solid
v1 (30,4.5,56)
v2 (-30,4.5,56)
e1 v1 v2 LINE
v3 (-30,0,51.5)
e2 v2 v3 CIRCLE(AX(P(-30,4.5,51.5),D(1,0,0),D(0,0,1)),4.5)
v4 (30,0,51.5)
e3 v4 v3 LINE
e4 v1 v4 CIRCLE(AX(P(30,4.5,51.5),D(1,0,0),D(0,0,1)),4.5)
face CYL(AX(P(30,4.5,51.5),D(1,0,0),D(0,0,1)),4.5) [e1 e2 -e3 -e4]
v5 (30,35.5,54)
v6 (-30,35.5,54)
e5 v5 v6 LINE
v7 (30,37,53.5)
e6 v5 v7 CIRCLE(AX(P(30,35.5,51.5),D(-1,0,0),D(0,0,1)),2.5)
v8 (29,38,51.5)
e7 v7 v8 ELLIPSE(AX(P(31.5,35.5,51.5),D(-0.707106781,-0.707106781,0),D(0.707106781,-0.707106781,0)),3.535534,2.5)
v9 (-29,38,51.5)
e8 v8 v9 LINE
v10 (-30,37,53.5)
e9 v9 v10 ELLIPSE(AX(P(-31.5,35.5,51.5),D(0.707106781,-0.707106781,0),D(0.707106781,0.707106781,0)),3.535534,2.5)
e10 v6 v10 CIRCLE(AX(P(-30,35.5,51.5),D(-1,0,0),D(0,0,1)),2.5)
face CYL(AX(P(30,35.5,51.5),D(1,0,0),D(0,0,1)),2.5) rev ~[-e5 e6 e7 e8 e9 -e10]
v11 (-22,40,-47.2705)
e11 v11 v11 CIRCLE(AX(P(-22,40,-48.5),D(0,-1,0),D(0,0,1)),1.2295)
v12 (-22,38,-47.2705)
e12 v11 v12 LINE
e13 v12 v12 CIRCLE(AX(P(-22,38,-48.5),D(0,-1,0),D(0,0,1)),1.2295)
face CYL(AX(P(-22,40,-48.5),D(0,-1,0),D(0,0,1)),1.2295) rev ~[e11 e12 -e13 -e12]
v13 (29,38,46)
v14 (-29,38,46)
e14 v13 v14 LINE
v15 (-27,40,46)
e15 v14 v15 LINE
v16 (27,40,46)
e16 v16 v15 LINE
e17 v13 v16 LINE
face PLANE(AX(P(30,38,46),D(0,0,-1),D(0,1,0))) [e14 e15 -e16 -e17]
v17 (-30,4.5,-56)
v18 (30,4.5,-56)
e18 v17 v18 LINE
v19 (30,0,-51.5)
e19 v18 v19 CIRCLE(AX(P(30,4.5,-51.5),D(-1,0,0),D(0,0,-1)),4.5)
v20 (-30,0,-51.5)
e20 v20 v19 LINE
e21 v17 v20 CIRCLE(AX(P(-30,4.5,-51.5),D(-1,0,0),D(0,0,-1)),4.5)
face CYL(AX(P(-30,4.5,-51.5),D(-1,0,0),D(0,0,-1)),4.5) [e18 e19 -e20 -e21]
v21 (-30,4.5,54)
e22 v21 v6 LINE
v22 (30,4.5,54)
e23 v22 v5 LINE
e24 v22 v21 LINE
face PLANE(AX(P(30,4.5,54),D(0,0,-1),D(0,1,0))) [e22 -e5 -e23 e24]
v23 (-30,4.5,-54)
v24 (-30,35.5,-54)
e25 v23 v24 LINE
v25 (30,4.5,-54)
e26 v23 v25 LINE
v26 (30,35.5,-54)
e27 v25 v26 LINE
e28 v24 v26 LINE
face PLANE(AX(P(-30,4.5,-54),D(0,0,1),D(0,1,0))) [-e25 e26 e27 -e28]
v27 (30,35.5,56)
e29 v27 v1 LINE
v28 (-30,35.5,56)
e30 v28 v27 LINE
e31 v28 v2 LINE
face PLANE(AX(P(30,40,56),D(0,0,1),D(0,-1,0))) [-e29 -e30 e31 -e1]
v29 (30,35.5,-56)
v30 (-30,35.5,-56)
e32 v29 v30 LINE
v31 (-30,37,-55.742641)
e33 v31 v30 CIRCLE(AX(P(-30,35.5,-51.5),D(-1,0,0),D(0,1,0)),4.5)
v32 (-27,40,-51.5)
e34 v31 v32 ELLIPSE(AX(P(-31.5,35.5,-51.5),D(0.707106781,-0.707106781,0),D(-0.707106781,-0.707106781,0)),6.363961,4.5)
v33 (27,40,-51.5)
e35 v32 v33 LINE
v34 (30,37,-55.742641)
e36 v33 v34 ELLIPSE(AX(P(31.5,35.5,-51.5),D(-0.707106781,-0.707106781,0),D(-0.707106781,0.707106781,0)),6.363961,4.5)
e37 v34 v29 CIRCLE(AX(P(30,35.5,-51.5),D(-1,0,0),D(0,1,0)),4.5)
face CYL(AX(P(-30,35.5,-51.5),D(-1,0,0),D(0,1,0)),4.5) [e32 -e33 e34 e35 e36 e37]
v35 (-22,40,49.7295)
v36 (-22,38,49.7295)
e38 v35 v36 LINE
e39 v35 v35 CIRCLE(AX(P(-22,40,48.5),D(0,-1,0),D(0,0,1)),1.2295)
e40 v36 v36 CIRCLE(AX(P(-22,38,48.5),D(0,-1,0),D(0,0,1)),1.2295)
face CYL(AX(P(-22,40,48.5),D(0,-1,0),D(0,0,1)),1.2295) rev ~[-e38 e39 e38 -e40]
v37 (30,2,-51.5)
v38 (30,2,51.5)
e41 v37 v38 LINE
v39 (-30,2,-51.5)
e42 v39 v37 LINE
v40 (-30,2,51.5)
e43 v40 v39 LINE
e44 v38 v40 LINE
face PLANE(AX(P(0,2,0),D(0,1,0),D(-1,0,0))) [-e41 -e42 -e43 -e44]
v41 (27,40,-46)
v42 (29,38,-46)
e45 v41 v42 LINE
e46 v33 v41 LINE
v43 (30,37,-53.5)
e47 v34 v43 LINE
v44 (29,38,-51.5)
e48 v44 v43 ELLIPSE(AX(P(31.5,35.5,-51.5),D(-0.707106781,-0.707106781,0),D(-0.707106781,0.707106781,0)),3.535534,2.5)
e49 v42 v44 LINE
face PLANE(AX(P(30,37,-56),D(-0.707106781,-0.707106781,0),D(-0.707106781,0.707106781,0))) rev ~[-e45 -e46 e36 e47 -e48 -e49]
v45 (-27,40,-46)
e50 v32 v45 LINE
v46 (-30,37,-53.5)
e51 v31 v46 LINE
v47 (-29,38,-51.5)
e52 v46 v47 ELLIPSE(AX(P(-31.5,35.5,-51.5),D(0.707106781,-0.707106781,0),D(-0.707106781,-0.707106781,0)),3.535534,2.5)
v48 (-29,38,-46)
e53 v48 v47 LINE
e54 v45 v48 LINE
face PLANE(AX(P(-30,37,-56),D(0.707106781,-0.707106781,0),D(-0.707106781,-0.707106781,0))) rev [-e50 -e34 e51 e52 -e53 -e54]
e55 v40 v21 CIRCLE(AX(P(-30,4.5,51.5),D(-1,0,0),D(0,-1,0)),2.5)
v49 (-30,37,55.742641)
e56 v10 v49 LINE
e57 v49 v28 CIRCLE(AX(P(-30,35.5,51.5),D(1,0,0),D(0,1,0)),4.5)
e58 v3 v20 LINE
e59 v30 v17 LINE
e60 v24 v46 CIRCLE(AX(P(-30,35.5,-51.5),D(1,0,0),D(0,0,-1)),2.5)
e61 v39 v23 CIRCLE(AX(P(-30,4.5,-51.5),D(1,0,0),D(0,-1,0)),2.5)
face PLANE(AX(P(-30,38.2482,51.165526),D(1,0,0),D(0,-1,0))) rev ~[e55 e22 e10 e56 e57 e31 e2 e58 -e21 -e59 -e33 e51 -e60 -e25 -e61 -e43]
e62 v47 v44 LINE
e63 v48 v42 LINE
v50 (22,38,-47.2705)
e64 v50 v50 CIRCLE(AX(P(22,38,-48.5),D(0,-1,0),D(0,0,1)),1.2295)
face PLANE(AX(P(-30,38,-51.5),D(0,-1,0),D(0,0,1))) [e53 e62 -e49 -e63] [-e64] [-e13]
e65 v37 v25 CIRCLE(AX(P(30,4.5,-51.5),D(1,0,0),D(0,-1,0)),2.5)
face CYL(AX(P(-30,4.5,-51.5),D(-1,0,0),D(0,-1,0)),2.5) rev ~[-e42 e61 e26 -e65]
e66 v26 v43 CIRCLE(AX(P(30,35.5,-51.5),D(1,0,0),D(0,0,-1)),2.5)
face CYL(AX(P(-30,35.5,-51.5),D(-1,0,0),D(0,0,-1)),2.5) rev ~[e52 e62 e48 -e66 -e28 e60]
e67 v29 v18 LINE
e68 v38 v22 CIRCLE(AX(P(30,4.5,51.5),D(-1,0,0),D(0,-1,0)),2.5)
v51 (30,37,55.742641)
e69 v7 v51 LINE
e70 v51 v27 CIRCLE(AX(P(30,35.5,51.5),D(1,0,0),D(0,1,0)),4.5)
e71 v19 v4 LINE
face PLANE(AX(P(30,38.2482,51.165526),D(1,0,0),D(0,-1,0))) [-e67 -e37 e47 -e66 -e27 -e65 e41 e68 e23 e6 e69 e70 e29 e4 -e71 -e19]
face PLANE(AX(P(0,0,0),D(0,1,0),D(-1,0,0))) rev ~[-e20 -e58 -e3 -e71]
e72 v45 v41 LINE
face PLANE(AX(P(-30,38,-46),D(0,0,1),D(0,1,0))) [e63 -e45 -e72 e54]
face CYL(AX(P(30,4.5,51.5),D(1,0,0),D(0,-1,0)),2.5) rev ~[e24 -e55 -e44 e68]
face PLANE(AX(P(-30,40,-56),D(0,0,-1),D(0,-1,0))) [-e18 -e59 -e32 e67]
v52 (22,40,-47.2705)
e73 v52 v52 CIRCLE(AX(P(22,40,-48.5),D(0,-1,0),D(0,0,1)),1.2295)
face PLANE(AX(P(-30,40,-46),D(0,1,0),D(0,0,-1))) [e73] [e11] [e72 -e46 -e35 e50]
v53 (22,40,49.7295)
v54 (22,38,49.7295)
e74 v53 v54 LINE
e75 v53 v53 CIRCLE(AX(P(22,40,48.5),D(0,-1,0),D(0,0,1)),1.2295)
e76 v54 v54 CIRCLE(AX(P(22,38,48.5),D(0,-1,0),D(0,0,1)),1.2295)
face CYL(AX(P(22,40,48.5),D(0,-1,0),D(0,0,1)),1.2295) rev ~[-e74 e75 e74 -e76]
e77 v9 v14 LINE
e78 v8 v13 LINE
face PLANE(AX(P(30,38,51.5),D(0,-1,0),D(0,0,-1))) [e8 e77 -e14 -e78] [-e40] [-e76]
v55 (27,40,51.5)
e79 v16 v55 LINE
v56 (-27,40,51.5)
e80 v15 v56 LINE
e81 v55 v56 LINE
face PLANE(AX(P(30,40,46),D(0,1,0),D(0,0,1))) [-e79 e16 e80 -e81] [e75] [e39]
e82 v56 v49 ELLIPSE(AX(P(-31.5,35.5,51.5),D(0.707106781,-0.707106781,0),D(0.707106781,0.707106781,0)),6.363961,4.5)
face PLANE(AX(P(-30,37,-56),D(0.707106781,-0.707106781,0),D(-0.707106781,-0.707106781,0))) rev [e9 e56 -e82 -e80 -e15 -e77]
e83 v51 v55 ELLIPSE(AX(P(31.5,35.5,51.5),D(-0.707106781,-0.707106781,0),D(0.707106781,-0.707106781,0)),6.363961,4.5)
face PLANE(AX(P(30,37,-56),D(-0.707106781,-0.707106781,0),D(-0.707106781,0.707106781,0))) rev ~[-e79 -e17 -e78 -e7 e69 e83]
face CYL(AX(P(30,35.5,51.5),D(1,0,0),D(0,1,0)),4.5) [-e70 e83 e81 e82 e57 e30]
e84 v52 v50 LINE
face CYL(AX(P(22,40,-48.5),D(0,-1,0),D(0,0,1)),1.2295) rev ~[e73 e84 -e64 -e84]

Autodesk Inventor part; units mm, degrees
ref_plane "YZ Plane" through (0, 0, 0) normal (1, 0, 0) x (0, 1, 0)
ref_plane "XZ Plane" through (0, 0, 0) normal (0, 1, 0) x (-1, 0, 0)
ref_plane "XY Plane" through (0, 0, 0) normal (0, 0, 1) x (1, 0, 0)
sketch "Szkic1" plane through (0, 0, 0) normal (0, 1, 0) x (-1, 0, 0)
  line L0 (-30, 56) -> (30, 56)
  line L1 (30, 56) -> (30, -56)
  line L2 (30, -56) -> (-30, -56)
  line L3 (-30, -56) -> (-30, 56)
  line L4 (-30, 56) -> (30, -56) construction
  line L5 (30, 56) -> (-30, -56) construction
  point P0 (0, 0)
  dimension "d0" = 60
  dimension "d1" = 112
extrude "Płyta1" add sketch "Szkic1" along normal blind 2
sketch "Szkic2" plane through (30, 0, 54) normal (0, 0, 1) x (1, 0, 0)
  line L0 (-60, 0) -> (0, 0)
  line L1 (0, 0) -> (0, 40)
  line L2 (0, 40) -> (-60, 40)
  line L3 (-60, 40) -> (-60, 0)
edge flange "Kołnierz1" height 40 angle 90 thickness 2 bend radius 2.5 thickness toward (0, 0, 1) relief tear relief width 2 relief depth 1 corner gap 2 corner form 0 edges at (0, 2, 56) (0, 2, -56) wall of the first edge with corners at (-30, 0, 54) (30, 0, 54) (30, 40, 54) (-30, 40, 54)
bend "Zagięcie1"
corner "Narożnik1"
sketch "Szkic3" plane through (30, 38, 56) normal (0, 1, 0) x (-1, 0, 0)
  line L0 (60, 0) -> (0, 0)
  line L1 (0, 0) -> (0, -10)
  line L2 (0, -10) -> (60, -10)
  line L3 (60, -10) -> (60, 0)
edge flange "Kołnierz2" height 10 angle 90 thickness 2 bend radius 2.5 thickness toward (0, 1, 0) relief tear relief width 2 relief depth 1 corner gap 2 corner form 0 edges at (0, 40, 54) (0, 40, -54) wall of the first edge with corners at (-30, 38, 56) (30, 38, 56) (30, 38, 46) (-30, 38, 46)
bend "Zagięcie2"
corner "Narożnik2"
sketch "Szkic4" plane through (-30, 40, 46) normal (0, 1, 0) x (1, 0, 0)
  line L0 (60, 92) -> (0, 92) projected
  line L1 (0, 0) -> (60, 0) projected
  line L2 (0, 92) -> (0, 97.5) projected
  line L3 (60, 97.5) -> (60, 92) projected
  point P0 (30, 46)
  point P1 (8, -2.5)
  point P2 (52, -2.5)
  point P3 (8, 94.5)
  point P4 (52, 94.5)
  dimension "d24" = 2.5
  dimension "d25" = 2.5
  dimension "d26" = 2.5
  dimension "d27" = 2.5
  dimension "d28" = 8
  dimension "d29" = 8
hole "Otwór1" at (-22, 40, 48.5) at (22, 40, 48.5) at (-22, 40, -48.5) at (22, 40, -48.5) direction (0, -1, 0) diameter 2.459 depth 8.8 tip angle 118 thread size "M3x0.5" class "6H" standard "ANSI Metric M Profile"
sketch "Szkic5" plane through (30, 4.5, -56) normal (0, 0, -1) x (-1, 0, 0)
  line L0 (0, 33.5) -> (0, 31) projected
  line L1 (0, 32.5) -> (3, 35.5)
  line L2 (0, 35.5) -> (60, 35.5) projected
  line L3 (0, 35.5) -> (0, 31) projected
  point P0 (30, -4.5)
  dimension "d37" = 45
  dimension "d38" = 3
extrude "Wyciągnięcie proste1" cut sketch "Szkic5" against normal through all
mirror "Odbij1" about plane through (0, 0, 0) normal (1, 0, 0) of "Wyciągnięcie proste1"
equation "\"d2\" = Grubość"
equation "\"d3\" = SzerokośćGięciaPodcięcia"
equation "\"d4\" = GłębokośćGięciaPodcięcia"
equation "\"d5\" = MinimalnaPozostałość"
equation "\"d6\" = PromieńPrzejścia"
equation "\"d10\" = RozmiarPodcięciaNarożnika"
equation "\"d11\" = Wielk_odstępu"
equation "\"d12\" = Rozmiar_promienia_Jacobiego"
equation "\"d14\" = SzerokośćGięciaPodcięcia"
equation "\"d15\" = GłębokośćGięciaPodcięcia"
equation "\"d16\" = MinimalnaPozostałość"
equation "\"d17\" = PromieńPrzejścia"
equation "\"d21\" = RozmiarPodcięciaNarożnika"
equation "\"d22\" = Wielk_odstępu"
equation "\"d23\" = Rozmiar_promienia_Jacobiego"
equation "\"PromieńGięcia\" = Grubość"
equation "\"SzerokośćGięciaPodcięcia\" = Grubość"
equation "\"GłębokośćGięciaPodcięcia\" = 0.5 * Grubość"
equation "\"RozmiarPodcięciaNarożnika\" = 4 * Grubość"
equation "\"MinimalnaPozostałość\" = 2 * Grubość"
equation "\"PromieńPrzejścia\" = PromieńGięcia"
equation "\"Rozmiar_promienia_Jacobiego\" = PromieńGięcia"
equation "\"Wielk_odstępu\" = Grubość"
equation "\"Grubość\" = 2"
properties part number "puszka" material "Stal"
